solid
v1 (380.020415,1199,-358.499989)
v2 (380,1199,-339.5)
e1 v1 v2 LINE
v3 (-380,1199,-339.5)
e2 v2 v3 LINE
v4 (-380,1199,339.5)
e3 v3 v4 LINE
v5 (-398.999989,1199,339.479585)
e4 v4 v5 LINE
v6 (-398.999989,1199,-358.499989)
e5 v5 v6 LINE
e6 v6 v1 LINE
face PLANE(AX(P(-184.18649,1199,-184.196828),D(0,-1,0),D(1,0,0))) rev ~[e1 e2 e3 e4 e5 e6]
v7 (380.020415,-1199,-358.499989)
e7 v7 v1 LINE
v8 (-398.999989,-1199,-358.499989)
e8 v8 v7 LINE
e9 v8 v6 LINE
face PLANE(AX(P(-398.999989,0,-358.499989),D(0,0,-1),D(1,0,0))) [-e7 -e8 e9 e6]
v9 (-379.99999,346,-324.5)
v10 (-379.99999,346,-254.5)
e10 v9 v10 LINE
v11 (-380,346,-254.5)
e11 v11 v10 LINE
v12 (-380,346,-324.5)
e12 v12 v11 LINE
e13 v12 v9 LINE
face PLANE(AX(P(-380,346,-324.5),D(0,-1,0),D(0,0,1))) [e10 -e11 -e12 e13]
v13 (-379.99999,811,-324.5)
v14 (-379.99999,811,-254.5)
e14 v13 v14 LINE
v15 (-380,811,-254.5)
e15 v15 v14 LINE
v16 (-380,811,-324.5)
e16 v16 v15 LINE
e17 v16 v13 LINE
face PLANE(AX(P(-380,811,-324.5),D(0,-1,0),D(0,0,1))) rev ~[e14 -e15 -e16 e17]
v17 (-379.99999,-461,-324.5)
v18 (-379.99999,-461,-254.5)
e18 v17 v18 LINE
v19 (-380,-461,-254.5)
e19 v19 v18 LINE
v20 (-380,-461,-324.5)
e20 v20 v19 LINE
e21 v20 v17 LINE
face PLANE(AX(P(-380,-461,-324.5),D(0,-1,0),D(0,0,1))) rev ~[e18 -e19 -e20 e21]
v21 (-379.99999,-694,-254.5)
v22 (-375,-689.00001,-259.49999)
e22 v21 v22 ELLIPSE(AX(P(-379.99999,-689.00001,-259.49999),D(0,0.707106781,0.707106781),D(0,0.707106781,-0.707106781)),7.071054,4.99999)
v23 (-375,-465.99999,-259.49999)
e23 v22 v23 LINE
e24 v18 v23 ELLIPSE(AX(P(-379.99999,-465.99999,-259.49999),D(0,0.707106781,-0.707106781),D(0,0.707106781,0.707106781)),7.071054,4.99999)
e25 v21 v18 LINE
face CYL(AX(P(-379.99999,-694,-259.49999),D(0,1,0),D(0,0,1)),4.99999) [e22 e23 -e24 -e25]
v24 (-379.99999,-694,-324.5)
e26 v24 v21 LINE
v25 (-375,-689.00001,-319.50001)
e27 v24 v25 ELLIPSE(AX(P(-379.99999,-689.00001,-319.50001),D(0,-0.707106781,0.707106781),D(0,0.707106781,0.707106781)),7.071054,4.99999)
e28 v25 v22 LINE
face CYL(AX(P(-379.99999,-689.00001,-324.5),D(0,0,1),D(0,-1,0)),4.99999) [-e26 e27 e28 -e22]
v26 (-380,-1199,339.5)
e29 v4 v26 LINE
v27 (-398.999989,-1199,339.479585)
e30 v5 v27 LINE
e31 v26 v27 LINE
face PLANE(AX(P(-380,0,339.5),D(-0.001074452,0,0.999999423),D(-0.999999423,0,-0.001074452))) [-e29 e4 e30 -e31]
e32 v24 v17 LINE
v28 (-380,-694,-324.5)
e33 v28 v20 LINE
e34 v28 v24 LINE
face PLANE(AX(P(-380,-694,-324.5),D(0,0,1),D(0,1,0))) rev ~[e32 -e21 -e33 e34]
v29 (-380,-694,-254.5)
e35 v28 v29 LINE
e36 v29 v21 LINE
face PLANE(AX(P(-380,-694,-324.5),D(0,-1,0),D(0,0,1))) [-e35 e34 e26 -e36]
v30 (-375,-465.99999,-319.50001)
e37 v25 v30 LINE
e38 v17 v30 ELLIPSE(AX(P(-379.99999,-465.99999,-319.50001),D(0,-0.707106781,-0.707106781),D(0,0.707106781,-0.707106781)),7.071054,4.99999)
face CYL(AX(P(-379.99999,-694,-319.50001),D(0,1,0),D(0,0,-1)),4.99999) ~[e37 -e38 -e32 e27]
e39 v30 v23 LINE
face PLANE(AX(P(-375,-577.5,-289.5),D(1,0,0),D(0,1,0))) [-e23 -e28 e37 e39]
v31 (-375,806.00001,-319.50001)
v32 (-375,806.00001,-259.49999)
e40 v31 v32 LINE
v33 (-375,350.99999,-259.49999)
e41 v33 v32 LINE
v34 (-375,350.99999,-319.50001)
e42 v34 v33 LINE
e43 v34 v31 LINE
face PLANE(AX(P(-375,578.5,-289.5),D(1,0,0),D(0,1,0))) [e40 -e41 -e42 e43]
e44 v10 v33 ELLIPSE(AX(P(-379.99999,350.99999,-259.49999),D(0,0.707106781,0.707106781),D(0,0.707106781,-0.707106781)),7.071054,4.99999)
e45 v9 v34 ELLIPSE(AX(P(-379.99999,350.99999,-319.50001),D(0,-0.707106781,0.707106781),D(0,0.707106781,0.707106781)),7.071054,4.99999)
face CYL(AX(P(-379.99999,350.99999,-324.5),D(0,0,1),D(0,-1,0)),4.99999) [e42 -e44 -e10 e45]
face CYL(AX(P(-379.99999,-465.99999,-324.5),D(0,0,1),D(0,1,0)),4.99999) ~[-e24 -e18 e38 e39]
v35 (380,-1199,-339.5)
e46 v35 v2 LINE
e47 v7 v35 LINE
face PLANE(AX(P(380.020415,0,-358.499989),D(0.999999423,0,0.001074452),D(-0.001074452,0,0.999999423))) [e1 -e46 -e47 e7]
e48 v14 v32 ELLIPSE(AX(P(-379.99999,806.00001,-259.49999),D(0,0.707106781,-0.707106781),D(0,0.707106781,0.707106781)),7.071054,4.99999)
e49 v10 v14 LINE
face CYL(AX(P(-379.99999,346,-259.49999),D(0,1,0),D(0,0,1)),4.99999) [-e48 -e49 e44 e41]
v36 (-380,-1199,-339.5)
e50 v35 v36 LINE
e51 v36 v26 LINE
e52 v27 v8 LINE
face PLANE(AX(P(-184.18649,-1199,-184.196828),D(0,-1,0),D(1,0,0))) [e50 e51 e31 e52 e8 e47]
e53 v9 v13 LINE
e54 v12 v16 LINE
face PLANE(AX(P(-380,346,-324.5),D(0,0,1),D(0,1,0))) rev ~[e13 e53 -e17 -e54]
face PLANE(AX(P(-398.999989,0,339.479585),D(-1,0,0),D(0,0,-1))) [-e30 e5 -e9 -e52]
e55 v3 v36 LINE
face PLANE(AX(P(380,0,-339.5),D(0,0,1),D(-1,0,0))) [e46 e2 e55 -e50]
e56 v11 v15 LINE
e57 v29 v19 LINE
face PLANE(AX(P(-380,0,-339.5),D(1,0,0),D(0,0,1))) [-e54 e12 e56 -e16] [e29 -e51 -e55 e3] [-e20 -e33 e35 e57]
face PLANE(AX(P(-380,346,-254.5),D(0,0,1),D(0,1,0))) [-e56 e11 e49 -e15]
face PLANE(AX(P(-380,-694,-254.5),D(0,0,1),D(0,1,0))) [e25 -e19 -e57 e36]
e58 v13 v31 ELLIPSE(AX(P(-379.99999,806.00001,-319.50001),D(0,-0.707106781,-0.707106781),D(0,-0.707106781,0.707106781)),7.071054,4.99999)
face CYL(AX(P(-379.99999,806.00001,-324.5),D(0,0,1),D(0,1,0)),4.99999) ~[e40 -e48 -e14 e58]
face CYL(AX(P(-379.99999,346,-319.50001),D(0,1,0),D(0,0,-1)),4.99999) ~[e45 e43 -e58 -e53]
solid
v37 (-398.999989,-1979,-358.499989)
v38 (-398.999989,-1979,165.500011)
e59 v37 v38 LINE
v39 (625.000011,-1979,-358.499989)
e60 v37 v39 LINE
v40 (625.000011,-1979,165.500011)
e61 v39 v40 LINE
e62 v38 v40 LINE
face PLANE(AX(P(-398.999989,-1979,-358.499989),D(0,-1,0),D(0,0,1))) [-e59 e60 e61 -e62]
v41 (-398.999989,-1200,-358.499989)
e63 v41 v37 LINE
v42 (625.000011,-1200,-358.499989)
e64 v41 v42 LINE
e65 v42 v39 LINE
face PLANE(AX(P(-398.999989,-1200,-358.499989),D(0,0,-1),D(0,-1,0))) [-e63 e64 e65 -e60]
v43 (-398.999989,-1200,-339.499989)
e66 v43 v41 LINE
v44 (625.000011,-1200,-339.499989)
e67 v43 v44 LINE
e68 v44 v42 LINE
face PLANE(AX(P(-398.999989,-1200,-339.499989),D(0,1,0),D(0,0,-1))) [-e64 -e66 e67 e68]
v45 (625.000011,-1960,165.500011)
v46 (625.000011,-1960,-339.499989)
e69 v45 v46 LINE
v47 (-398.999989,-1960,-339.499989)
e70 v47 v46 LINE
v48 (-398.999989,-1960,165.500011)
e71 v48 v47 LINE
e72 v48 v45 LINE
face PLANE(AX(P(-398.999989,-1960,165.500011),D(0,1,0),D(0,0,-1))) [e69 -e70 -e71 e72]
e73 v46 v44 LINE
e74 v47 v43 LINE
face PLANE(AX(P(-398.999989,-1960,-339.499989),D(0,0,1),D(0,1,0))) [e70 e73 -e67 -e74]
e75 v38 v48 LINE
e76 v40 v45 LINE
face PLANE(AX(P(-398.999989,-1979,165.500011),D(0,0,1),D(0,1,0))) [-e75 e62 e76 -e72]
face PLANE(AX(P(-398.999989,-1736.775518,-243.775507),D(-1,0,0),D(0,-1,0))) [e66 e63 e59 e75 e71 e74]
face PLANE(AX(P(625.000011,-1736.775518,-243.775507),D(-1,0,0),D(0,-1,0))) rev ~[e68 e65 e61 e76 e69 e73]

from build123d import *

# Parameters (mm, degrees)
F1_DEPTH = 1199
F2_W     = 233
F2_H     = 70
F2_W_2   = 465
F3_DEPTH = 5
F4_R     = 4.99999
F6_DEPTH = 1024


# Not quite as in the source:
# - a fillet or chamfer is up to 0.001 mm smaller than in the source, because OpenCascade refuses the exact size


with BuildPart() as f1:
    # F0 (on Front) → F1 (new body, symmetric)
    with BuildSketch(Plane.XZ):
        Polygon((380, -339.5), (-380, -339.5), (-380, 339.5), (-398.9999890327, 339.4795854083), (-398.9999890327, -358.4999890327), (380.0204145917, -358.4999890327), align=None)
    extrude(amount=F1_DEPTH, both=True)

    # F2 (on face) → F3 (join)
    with BuildSketch(Plane.YZ.offset(-380)):
        with Locations((-577.5, -289.5)):
            Rectangle(F2_W, F2_H)
        with Locations((578.5, -289.5)):
            Rectangle(F2_W_2, F2_H)
    extrude(amount=F3_DEPTH)

    # F4 (radius 5 in the source; OpenCascade refuses exactly that, so slightly less here)
    f4_edges = [f1.edges().sort_by_distance(p)[0] for p in [
        (-375, -577.5, -254.5),
        (-375, -694, -289.5),
        (-375, -577.5, -324.5),
        (-375, -461, -289.5),
        (-375, 811, -289.5),
        (-375, 578.5, -254.5),
        (-375, 346, -289.5),
        (-375, 578.5, -324.5),
    ]]
    fillet(f4_edges, radius=F4_R)


with BuildPart() as f6:
    # F5 (on face) → F6 (new body)
    with BuildSketch(Plane(origin=(-398.9999890327, 0, 0), x_dir=(0, -1, 0), z_dir=(-1, 0, 0))):
        Polygon((1979, 165.5000109673), (1960, 165.5000109673), (1960, -339.4999890327), (1200, -339.4999890327), (1200, -358.4999890327), (1979, -358.4999890327), align=None)
    extrude(amount=-F6_DEPTH)


solid = Compound([f1.part, f6.part])
